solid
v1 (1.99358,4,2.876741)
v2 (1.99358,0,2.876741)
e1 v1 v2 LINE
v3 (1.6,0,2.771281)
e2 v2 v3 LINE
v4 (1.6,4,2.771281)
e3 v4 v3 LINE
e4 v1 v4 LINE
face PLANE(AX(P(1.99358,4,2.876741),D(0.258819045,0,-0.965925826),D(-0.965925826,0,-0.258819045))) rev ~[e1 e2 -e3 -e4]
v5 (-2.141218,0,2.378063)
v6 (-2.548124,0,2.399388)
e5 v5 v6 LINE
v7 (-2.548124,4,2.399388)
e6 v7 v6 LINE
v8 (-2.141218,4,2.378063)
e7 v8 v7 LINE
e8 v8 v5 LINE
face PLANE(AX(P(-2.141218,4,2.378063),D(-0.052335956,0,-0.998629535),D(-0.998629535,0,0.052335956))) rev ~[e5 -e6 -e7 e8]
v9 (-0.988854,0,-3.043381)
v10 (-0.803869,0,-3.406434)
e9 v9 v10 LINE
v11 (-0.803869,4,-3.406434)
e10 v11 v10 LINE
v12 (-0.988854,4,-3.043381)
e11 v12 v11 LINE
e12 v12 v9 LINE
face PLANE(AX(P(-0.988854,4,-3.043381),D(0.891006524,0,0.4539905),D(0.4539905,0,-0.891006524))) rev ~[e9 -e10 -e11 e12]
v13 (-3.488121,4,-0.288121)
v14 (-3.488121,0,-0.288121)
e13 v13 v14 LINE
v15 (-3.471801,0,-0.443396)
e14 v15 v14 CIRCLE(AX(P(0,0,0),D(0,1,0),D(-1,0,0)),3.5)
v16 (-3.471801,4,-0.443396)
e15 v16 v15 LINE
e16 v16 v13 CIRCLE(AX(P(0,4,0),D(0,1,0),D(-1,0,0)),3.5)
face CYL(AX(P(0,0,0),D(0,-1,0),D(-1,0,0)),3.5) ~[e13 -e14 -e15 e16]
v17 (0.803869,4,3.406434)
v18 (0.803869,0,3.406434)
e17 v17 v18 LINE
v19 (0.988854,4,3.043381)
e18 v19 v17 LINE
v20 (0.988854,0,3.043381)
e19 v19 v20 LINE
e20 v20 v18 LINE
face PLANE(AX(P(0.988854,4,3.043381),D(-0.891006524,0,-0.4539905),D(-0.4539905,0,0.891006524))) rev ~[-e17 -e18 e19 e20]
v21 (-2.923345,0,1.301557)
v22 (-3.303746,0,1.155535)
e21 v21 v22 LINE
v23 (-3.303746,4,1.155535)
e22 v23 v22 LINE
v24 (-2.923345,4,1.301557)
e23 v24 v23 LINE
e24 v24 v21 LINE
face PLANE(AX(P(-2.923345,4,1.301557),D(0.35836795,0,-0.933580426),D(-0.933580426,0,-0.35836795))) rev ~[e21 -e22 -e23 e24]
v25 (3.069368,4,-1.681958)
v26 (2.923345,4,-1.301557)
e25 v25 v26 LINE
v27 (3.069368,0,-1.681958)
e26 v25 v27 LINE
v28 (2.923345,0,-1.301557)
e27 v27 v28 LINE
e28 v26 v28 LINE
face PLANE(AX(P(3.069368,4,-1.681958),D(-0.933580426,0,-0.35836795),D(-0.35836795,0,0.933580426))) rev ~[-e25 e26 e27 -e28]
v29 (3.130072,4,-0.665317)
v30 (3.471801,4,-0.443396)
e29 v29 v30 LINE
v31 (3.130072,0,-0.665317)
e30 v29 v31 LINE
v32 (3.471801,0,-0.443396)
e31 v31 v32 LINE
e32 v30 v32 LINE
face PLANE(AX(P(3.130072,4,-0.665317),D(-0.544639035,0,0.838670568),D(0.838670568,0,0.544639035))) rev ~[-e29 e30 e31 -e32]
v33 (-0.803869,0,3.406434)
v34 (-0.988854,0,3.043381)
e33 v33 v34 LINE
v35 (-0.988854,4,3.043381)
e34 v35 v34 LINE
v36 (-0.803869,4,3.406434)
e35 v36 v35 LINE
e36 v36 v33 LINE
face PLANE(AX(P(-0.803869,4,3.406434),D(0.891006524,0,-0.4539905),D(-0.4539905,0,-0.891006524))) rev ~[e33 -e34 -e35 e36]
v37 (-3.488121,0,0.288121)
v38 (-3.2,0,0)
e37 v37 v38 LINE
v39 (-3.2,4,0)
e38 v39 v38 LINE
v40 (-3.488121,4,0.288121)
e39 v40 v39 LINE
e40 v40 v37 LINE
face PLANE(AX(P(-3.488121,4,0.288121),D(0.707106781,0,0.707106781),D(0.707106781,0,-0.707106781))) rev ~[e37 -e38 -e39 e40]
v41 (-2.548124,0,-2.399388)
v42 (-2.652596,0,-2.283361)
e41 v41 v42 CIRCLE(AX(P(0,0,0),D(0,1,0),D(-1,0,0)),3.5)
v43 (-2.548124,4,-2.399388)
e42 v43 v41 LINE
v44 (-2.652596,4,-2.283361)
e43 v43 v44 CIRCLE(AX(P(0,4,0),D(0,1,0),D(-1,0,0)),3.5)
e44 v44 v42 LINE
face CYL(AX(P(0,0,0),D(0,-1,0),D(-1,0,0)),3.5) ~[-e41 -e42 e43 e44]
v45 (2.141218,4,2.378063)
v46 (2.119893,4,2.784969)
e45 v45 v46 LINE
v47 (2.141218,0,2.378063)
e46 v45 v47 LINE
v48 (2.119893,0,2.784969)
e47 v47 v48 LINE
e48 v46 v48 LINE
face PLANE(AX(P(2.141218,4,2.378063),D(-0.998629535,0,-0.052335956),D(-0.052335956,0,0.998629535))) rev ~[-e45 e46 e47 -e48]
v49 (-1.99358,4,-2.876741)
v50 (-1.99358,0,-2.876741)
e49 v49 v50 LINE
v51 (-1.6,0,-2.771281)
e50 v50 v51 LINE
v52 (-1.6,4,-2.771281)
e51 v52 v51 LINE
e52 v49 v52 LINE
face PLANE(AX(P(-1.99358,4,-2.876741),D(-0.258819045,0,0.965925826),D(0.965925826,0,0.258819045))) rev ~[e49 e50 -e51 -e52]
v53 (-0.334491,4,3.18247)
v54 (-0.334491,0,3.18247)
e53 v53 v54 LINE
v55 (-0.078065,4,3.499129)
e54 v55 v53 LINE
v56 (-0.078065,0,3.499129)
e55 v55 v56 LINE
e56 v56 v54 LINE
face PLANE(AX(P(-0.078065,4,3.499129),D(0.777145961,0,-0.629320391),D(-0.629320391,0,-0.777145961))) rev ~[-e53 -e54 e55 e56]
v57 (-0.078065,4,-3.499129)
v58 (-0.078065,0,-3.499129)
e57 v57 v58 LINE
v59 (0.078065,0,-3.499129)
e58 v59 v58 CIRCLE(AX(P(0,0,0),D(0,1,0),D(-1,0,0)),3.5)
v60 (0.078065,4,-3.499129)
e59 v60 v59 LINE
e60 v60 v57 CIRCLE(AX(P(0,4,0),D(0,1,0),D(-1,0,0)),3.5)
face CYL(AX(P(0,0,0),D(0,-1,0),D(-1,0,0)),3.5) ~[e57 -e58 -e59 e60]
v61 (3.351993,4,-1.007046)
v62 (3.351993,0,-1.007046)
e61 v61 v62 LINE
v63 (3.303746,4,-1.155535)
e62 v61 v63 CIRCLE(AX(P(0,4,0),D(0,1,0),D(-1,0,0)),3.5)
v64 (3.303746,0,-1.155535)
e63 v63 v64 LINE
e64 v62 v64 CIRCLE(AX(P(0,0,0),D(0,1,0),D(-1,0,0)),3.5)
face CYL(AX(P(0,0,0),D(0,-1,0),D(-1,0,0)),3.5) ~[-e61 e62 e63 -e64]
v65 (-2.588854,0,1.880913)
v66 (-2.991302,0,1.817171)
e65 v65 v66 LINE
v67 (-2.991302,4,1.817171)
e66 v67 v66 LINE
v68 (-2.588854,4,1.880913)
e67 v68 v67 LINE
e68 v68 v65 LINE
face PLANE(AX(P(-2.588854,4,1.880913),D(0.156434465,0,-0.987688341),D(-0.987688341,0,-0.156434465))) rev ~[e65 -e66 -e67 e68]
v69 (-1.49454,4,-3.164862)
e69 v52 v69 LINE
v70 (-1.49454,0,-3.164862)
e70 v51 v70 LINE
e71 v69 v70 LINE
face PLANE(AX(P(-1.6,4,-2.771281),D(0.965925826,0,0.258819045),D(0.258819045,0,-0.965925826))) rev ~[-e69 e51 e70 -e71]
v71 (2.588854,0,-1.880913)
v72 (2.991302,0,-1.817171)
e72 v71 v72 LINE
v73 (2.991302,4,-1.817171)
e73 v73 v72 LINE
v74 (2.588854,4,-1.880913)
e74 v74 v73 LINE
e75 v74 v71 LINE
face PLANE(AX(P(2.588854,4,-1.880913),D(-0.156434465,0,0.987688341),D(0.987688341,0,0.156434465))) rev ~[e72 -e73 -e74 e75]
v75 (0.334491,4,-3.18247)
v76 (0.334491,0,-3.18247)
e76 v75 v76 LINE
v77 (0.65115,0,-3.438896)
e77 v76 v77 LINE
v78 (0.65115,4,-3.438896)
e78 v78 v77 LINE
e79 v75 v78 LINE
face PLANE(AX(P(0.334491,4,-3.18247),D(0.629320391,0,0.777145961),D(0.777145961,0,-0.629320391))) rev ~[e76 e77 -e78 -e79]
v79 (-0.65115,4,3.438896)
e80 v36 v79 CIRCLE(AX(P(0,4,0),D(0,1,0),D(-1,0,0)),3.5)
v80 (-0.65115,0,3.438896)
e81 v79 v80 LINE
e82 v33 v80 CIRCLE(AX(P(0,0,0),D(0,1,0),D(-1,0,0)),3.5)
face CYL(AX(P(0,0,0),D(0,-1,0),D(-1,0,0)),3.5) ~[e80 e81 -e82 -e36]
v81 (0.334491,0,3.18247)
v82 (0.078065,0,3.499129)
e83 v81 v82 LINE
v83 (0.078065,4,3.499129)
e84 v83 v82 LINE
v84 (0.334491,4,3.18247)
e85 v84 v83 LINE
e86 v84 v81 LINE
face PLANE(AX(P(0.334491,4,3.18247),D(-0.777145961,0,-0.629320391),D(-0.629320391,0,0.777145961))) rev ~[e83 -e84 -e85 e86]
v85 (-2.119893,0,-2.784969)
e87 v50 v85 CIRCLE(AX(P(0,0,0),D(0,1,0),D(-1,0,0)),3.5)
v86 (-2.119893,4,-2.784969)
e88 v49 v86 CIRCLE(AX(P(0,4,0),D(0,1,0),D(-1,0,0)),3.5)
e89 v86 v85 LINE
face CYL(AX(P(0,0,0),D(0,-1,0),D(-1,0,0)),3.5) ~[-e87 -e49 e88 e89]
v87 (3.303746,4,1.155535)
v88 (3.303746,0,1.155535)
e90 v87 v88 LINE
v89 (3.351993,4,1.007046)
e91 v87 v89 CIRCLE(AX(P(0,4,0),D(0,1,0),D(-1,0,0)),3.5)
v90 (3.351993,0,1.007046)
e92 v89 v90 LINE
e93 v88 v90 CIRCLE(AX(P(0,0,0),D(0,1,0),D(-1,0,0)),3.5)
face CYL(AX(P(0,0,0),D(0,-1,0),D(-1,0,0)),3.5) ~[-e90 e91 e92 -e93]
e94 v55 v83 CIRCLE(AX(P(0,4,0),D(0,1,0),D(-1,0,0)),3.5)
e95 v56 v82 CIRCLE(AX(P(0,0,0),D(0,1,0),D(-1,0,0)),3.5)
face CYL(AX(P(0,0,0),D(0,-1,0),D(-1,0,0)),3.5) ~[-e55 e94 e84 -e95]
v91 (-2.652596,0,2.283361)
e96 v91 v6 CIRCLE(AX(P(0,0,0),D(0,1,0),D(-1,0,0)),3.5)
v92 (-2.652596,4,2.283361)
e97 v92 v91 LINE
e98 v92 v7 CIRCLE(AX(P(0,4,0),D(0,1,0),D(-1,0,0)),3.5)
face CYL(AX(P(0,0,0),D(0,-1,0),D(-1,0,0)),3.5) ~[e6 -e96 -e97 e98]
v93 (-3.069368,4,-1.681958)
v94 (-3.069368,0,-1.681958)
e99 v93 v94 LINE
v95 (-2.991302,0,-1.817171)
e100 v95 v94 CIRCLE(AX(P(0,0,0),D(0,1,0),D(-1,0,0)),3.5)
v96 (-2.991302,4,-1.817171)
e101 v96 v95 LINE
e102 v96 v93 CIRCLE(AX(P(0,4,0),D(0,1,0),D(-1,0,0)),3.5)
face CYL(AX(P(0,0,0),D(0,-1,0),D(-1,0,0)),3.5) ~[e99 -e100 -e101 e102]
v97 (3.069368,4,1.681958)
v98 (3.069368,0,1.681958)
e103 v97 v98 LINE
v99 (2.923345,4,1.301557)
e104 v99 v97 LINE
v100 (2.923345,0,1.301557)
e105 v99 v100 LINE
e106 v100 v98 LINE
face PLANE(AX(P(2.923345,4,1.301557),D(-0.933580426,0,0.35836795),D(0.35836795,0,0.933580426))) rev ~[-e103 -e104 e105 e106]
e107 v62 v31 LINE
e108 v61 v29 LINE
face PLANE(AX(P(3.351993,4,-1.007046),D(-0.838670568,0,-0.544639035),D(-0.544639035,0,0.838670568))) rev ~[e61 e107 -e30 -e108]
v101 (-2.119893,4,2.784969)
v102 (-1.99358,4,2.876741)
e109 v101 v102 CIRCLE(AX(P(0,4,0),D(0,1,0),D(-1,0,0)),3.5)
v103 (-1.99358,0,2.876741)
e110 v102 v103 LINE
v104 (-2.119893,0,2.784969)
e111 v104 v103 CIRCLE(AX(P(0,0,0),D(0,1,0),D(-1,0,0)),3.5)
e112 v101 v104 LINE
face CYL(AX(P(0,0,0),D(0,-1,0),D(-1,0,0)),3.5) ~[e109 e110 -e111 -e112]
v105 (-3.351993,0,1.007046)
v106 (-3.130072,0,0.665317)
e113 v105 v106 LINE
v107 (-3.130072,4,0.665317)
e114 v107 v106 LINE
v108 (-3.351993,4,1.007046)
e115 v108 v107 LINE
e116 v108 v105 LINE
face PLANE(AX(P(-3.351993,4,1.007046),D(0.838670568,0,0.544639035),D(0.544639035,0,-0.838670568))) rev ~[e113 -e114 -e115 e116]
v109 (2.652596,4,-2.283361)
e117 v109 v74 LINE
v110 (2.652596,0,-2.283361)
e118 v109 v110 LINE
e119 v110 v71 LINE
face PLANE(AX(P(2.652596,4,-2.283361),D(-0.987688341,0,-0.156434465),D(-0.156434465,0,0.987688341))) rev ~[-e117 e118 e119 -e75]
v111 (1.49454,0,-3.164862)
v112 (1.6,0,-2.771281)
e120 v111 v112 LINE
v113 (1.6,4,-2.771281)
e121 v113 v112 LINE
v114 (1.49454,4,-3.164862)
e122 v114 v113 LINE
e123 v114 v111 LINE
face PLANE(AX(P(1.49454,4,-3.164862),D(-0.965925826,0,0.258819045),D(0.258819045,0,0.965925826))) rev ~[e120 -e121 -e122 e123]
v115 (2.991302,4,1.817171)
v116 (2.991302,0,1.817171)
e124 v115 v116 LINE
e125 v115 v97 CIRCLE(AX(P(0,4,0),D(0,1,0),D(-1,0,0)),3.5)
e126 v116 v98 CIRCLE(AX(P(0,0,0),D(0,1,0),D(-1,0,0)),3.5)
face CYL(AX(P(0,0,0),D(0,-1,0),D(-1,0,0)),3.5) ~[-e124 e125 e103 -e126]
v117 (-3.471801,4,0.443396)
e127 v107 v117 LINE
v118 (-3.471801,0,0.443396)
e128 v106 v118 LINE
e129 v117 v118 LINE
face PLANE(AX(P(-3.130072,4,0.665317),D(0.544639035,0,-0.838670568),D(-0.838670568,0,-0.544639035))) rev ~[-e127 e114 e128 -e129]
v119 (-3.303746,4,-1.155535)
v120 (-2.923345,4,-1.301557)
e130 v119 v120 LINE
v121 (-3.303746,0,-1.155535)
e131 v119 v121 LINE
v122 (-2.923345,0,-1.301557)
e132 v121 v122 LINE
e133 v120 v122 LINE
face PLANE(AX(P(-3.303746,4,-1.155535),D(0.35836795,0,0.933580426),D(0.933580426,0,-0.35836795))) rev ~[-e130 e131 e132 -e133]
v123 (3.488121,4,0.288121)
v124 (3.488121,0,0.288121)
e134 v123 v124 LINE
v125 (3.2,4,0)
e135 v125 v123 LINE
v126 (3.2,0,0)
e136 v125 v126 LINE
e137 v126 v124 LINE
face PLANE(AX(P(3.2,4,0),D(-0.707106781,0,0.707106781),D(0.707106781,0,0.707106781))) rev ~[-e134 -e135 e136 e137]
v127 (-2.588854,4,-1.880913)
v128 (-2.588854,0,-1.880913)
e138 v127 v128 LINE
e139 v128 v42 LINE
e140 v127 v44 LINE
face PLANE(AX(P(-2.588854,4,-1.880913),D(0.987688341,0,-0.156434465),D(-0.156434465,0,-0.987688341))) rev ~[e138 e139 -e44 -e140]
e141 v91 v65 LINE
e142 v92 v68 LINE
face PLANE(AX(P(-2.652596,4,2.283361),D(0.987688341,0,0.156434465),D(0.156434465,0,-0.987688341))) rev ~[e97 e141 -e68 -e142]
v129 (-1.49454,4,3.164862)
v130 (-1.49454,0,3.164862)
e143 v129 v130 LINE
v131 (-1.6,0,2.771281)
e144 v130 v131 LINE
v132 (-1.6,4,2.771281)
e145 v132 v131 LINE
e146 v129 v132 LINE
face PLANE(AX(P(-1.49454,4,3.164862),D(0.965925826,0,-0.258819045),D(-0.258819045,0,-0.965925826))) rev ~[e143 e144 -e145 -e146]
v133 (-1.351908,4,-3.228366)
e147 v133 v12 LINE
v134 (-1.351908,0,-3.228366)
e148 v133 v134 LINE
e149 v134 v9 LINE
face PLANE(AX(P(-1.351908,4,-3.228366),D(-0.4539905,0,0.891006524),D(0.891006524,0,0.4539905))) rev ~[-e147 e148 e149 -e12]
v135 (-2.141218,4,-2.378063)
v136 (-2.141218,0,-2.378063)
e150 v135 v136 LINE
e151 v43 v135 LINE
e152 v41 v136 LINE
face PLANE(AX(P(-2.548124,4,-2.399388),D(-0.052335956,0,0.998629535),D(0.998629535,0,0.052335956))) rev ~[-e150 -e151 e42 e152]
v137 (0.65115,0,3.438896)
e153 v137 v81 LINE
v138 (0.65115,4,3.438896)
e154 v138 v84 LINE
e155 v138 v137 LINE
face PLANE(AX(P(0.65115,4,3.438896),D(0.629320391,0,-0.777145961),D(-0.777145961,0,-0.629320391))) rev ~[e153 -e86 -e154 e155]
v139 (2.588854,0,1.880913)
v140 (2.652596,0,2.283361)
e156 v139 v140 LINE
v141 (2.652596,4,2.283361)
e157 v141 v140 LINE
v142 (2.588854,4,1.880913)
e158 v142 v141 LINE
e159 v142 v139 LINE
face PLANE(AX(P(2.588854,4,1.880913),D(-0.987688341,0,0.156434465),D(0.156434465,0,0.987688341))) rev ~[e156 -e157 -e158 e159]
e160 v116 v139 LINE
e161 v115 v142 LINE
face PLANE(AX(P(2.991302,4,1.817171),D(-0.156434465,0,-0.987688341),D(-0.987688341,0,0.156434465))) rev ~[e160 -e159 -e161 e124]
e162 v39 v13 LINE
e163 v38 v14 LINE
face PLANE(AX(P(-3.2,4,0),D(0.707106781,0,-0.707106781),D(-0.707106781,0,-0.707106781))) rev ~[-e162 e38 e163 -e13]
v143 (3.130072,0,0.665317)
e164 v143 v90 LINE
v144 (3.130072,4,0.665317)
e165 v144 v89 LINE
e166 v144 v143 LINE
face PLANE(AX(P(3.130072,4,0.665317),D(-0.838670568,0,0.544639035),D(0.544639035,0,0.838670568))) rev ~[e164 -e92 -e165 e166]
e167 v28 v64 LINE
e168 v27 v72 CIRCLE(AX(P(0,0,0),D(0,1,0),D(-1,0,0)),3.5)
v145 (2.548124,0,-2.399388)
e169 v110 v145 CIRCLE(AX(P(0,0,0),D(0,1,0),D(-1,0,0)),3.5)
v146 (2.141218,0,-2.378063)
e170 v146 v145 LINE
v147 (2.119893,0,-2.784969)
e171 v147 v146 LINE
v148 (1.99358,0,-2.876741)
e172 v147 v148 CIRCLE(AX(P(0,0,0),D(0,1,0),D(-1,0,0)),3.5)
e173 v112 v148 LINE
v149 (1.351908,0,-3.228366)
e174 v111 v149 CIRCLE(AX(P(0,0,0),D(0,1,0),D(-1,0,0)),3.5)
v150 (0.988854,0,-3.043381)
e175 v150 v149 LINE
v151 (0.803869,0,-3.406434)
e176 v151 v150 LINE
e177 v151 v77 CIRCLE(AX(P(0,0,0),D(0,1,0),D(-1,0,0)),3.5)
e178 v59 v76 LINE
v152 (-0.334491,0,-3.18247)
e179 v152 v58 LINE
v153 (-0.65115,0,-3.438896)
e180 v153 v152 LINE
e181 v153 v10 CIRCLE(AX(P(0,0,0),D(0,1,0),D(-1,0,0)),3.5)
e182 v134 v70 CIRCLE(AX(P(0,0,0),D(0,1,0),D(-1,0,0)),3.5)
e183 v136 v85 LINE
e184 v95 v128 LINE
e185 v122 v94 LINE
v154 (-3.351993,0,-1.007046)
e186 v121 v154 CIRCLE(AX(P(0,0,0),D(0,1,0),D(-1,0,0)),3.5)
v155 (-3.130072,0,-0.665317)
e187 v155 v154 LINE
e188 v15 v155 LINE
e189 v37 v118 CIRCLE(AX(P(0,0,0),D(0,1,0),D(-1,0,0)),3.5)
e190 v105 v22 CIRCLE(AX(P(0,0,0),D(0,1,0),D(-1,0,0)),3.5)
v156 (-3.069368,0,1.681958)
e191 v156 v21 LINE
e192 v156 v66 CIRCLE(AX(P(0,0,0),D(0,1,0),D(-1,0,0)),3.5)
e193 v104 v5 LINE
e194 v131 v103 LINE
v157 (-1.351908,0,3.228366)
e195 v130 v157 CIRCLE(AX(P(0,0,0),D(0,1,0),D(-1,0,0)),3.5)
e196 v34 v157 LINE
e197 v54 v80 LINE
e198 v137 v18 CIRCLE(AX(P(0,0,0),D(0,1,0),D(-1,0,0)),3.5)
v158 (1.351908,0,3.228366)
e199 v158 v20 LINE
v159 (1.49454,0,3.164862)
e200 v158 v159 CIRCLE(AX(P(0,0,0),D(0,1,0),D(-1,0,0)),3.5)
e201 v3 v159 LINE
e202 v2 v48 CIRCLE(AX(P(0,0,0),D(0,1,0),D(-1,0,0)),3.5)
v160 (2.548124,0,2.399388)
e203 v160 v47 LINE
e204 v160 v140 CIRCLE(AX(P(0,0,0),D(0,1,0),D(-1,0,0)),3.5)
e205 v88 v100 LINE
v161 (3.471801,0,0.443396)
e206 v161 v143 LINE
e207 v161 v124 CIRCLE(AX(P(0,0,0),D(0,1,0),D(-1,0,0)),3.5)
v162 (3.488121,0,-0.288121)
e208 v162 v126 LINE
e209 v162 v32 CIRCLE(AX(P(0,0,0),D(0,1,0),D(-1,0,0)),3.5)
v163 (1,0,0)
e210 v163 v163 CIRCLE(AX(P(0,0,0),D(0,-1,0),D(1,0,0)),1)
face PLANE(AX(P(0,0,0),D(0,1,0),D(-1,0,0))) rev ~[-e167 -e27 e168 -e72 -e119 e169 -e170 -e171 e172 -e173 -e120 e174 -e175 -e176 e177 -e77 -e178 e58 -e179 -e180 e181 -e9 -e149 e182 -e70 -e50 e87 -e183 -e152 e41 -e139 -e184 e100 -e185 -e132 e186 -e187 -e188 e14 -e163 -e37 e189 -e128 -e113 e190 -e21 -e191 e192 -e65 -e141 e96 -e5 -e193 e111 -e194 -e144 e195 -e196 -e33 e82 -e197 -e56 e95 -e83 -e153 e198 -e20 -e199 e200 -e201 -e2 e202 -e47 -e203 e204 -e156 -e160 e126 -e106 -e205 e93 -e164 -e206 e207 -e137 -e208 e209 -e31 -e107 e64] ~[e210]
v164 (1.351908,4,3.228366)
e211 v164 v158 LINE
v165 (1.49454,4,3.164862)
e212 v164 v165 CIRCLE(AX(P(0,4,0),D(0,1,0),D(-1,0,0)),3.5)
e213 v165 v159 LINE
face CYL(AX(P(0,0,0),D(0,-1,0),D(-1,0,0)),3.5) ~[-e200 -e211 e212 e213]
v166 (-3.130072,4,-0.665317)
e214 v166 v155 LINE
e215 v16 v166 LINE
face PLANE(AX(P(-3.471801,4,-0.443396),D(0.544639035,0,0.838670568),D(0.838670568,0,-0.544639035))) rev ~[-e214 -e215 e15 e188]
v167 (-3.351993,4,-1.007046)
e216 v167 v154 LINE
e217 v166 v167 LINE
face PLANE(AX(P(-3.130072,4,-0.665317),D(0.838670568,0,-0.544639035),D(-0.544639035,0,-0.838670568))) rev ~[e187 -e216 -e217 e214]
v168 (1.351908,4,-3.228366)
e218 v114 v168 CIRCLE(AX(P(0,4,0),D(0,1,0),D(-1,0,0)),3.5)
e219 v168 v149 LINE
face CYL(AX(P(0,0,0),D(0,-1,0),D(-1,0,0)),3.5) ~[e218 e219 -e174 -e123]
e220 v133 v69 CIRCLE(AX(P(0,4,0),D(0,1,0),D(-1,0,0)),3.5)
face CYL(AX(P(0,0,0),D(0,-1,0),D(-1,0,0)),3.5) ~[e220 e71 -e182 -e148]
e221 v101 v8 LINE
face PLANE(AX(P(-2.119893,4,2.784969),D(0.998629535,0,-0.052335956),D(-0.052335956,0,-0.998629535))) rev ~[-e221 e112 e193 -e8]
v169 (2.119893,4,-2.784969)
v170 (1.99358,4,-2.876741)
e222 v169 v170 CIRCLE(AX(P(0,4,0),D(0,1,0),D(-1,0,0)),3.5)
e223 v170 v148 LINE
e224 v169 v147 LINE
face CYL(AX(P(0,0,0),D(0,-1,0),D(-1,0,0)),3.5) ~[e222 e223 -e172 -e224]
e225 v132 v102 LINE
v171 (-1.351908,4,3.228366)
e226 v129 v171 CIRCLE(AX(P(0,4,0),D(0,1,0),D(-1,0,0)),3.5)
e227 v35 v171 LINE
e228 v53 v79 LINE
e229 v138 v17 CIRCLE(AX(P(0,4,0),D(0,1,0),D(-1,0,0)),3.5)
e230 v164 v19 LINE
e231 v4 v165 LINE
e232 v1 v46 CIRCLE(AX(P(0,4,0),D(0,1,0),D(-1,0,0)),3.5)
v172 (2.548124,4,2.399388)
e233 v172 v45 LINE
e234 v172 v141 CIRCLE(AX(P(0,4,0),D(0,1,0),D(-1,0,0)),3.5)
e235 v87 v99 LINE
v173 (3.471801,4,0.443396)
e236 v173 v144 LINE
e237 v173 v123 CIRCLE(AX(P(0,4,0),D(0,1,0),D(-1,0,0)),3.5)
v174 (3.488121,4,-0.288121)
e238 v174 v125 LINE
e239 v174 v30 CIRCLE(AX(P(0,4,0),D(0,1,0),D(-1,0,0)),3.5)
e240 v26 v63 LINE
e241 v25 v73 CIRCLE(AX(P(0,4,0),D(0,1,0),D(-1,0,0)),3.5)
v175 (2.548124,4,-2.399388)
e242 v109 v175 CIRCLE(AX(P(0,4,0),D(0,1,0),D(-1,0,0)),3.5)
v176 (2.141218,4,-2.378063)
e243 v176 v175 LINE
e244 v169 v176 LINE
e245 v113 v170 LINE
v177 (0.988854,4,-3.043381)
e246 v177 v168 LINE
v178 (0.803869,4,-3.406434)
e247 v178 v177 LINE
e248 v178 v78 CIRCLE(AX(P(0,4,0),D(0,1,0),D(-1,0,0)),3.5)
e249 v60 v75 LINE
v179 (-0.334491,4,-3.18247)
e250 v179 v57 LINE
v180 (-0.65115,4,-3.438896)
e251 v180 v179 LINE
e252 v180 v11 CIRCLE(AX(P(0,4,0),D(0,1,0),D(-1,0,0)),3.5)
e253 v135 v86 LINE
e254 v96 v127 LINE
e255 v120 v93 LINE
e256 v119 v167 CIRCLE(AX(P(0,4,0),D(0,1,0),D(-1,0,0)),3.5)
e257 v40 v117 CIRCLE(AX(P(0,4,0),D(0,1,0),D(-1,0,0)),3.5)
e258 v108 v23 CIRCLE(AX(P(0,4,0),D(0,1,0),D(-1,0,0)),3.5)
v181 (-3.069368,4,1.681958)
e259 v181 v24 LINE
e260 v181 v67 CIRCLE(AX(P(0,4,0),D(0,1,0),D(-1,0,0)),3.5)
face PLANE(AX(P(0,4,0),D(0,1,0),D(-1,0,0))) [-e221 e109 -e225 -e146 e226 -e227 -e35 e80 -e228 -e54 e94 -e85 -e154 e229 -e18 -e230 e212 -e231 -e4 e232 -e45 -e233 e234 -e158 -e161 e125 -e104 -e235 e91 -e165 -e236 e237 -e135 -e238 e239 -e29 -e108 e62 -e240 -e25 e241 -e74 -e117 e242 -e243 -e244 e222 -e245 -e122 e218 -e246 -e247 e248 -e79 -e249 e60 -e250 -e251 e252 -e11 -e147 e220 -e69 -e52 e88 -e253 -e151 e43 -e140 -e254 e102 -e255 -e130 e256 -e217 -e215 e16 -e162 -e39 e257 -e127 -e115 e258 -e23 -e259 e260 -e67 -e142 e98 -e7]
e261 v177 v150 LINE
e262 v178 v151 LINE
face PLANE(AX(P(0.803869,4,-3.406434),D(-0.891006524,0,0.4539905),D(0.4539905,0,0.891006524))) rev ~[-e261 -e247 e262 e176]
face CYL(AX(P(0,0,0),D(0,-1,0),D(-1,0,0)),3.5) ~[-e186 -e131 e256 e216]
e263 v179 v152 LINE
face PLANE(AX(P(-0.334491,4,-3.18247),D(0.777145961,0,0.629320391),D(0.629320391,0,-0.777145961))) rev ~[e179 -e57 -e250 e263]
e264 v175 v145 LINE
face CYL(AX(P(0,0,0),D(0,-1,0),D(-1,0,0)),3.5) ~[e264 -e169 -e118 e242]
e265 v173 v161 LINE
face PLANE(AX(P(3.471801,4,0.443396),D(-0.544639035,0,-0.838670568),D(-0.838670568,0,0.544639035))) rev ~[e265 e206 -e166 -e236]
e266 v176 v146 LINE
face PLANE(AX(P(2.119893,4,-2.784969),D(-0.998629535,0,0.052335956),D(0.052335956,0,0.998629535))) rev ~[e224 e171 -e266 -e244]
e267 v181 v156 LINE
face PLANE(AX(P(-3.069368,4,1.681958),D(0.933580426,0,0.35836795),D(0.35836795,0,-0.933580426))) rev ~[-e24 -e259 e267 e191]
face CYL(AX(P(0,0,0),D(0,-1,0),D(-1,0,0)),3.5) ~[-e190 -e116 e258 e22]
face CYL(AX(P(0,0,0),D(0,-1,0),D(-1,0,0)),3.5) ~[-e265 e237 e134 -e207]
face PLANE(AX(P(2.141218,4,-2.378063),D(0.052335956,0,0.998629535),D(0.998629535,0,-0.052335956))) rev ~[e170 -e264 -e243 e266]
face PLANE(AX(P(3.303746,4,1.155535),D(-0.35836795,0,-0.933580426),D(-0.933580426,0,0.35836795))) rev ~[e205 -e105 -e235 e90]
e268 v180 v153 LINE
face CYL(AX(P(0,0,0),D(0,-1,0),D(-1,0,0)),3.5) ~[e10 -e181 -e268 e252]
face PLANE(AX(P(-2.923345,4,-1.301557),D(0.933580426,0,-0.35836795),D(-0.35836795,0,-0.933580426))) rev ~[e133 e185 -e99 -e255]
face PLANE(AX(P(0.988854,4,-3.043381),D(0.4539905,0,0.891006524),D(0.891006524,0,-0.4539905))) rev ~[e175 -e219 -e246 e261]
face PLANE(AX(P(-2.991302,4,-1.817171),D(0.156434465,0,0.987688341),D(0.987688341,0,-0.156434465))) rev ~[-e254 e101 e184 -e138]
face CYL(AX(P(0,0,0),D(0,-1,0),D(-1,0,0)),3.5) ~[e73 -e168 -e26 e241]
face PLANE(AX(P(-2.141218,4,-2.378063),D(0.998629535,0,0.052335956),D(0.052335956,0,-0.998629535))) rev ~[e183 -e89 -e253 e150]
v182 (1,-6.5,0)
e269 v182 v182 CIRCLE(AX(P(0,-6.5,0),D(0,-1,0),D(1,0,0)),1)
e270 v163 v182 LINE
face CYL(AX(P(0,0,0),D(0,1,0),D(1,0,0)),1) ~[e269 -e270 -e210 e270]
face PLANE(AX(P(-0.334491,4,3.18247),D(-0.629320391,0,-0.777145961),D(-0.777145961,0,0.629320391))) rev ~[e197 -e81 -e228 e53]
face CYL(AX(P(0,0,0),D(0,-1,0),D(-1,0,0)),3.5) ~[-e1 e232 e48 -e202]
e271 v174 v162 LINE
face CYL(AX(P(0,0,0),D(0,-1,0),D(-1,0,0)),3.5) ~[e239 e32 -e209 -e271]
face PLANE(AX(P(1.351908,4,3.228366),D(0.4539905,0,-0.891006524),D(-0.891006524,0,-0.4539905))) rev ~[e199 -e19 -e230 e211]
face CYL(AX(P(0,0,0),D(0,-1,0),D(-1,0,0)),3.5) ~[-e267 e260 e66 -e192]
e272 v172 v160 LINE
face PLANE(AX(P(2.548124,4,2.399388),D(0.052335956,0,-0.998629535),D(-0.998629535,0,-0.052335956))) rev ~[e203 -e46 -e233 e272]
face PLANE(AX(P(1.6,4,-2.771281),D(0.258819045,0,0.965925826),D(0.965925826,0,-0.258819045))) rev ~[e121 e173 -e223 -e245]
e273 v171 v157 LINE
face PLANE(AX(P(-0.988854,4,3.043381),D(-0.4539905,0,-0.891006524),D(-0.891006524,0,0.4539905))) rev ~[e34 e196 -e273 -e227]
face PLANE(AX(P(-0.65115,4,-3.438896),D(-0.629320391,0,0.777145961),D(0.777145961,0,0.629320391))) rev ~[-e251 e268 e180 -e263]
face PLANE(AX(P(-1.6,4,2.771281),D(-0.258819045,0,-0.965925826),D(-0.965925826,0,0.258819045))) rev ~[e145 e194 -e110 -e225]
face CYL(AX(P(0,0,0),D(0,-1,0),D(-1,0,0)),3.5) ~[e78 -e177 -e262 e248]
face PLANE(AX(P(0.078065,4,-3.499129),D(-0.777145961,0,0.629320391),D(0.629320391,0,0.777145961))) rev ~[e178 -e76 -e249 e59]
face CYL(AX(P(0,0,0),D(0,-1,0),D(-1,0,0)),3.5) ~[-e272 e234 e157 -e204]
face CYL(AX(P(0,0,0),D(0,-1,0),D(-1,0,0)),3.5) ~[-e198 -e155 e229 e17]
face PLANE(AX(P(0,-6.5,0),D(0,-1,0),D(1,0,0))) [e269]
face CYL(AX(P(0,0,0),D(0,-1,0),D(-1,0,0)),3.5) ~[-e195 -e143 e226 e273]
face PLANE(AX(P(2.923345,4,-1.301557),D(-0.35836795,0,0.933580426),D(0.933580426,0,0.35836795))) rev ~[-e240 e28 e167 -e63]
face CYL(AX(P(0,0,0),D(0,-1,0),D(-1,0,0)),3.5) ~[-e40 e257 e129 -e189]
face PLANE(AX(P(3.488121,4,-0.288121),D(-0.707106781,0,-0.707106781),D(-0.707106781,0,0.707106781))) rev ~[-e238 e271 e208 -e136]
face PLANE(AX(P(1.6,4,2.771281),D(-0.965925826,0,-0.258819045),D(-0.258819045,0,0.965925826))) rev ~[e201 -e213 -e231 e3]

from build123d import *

# Parameters (mm, degrees)
F0_R            = 1
F1_DEPTH        = 6.5
F2_R            = 3.5
F3_DEPTH        = 4
F5_DEPTH        = 10.501
F5_COPIES_COUNT = 30


# Not quite as in the source:
# - a pattern or mirror of a feature is missing from the dataset's text; its kind, count and spacing are read off the source's solid


with BuildPart() as f1:
    # F0 (on Front) → F1 (new body)
    with BuildSketch(Plane.XZ):
        Circle(F0_R)
    extrude(amount=F1_DEPTH)

    # F2 (on face) → F3 (join)
    with BuildSketch(Plane(origin=(0, 0, 0), x_dir=(-1, 0, 0), z_dir=(0, 1, 0))):
        Circle(F2_R)
    extrude(amount=F3_DEPTH)

    # F4 (on face) → F5 (cut, through all)
    with BuildSketch(Plane(origin=(0, 4, 0), x_dir=(-1, 0, 0), z_dir=(0, 1, 0))):
        with BuildLine():
            Line((3.2, 0), (3.4881207588, -0.2881207588))
            ThreePointArc((3.4881207588, -0.2881207588), (3.5, 0), (3.4881207588, 0.2881207588))
            Line((3.4881207588, 0.2881207588), (3.2, 0))
        make_face()
    f5 = extrude(amount=-F5_DEPTH, mode=Mode.SUBTRACT)

    # F5_copies: F5 ×30 about axis
    f5_copies_axis = Axis((0, 0, 0), (0, 1, 0))
    for i in range(1, F5_COPIES_COUNT):
        add(f5.rotate(f5_copies_axis, i * 360 / F5_COPIES_COUNT), mode=Mode.SUBTRACT)


solid = f1.part
